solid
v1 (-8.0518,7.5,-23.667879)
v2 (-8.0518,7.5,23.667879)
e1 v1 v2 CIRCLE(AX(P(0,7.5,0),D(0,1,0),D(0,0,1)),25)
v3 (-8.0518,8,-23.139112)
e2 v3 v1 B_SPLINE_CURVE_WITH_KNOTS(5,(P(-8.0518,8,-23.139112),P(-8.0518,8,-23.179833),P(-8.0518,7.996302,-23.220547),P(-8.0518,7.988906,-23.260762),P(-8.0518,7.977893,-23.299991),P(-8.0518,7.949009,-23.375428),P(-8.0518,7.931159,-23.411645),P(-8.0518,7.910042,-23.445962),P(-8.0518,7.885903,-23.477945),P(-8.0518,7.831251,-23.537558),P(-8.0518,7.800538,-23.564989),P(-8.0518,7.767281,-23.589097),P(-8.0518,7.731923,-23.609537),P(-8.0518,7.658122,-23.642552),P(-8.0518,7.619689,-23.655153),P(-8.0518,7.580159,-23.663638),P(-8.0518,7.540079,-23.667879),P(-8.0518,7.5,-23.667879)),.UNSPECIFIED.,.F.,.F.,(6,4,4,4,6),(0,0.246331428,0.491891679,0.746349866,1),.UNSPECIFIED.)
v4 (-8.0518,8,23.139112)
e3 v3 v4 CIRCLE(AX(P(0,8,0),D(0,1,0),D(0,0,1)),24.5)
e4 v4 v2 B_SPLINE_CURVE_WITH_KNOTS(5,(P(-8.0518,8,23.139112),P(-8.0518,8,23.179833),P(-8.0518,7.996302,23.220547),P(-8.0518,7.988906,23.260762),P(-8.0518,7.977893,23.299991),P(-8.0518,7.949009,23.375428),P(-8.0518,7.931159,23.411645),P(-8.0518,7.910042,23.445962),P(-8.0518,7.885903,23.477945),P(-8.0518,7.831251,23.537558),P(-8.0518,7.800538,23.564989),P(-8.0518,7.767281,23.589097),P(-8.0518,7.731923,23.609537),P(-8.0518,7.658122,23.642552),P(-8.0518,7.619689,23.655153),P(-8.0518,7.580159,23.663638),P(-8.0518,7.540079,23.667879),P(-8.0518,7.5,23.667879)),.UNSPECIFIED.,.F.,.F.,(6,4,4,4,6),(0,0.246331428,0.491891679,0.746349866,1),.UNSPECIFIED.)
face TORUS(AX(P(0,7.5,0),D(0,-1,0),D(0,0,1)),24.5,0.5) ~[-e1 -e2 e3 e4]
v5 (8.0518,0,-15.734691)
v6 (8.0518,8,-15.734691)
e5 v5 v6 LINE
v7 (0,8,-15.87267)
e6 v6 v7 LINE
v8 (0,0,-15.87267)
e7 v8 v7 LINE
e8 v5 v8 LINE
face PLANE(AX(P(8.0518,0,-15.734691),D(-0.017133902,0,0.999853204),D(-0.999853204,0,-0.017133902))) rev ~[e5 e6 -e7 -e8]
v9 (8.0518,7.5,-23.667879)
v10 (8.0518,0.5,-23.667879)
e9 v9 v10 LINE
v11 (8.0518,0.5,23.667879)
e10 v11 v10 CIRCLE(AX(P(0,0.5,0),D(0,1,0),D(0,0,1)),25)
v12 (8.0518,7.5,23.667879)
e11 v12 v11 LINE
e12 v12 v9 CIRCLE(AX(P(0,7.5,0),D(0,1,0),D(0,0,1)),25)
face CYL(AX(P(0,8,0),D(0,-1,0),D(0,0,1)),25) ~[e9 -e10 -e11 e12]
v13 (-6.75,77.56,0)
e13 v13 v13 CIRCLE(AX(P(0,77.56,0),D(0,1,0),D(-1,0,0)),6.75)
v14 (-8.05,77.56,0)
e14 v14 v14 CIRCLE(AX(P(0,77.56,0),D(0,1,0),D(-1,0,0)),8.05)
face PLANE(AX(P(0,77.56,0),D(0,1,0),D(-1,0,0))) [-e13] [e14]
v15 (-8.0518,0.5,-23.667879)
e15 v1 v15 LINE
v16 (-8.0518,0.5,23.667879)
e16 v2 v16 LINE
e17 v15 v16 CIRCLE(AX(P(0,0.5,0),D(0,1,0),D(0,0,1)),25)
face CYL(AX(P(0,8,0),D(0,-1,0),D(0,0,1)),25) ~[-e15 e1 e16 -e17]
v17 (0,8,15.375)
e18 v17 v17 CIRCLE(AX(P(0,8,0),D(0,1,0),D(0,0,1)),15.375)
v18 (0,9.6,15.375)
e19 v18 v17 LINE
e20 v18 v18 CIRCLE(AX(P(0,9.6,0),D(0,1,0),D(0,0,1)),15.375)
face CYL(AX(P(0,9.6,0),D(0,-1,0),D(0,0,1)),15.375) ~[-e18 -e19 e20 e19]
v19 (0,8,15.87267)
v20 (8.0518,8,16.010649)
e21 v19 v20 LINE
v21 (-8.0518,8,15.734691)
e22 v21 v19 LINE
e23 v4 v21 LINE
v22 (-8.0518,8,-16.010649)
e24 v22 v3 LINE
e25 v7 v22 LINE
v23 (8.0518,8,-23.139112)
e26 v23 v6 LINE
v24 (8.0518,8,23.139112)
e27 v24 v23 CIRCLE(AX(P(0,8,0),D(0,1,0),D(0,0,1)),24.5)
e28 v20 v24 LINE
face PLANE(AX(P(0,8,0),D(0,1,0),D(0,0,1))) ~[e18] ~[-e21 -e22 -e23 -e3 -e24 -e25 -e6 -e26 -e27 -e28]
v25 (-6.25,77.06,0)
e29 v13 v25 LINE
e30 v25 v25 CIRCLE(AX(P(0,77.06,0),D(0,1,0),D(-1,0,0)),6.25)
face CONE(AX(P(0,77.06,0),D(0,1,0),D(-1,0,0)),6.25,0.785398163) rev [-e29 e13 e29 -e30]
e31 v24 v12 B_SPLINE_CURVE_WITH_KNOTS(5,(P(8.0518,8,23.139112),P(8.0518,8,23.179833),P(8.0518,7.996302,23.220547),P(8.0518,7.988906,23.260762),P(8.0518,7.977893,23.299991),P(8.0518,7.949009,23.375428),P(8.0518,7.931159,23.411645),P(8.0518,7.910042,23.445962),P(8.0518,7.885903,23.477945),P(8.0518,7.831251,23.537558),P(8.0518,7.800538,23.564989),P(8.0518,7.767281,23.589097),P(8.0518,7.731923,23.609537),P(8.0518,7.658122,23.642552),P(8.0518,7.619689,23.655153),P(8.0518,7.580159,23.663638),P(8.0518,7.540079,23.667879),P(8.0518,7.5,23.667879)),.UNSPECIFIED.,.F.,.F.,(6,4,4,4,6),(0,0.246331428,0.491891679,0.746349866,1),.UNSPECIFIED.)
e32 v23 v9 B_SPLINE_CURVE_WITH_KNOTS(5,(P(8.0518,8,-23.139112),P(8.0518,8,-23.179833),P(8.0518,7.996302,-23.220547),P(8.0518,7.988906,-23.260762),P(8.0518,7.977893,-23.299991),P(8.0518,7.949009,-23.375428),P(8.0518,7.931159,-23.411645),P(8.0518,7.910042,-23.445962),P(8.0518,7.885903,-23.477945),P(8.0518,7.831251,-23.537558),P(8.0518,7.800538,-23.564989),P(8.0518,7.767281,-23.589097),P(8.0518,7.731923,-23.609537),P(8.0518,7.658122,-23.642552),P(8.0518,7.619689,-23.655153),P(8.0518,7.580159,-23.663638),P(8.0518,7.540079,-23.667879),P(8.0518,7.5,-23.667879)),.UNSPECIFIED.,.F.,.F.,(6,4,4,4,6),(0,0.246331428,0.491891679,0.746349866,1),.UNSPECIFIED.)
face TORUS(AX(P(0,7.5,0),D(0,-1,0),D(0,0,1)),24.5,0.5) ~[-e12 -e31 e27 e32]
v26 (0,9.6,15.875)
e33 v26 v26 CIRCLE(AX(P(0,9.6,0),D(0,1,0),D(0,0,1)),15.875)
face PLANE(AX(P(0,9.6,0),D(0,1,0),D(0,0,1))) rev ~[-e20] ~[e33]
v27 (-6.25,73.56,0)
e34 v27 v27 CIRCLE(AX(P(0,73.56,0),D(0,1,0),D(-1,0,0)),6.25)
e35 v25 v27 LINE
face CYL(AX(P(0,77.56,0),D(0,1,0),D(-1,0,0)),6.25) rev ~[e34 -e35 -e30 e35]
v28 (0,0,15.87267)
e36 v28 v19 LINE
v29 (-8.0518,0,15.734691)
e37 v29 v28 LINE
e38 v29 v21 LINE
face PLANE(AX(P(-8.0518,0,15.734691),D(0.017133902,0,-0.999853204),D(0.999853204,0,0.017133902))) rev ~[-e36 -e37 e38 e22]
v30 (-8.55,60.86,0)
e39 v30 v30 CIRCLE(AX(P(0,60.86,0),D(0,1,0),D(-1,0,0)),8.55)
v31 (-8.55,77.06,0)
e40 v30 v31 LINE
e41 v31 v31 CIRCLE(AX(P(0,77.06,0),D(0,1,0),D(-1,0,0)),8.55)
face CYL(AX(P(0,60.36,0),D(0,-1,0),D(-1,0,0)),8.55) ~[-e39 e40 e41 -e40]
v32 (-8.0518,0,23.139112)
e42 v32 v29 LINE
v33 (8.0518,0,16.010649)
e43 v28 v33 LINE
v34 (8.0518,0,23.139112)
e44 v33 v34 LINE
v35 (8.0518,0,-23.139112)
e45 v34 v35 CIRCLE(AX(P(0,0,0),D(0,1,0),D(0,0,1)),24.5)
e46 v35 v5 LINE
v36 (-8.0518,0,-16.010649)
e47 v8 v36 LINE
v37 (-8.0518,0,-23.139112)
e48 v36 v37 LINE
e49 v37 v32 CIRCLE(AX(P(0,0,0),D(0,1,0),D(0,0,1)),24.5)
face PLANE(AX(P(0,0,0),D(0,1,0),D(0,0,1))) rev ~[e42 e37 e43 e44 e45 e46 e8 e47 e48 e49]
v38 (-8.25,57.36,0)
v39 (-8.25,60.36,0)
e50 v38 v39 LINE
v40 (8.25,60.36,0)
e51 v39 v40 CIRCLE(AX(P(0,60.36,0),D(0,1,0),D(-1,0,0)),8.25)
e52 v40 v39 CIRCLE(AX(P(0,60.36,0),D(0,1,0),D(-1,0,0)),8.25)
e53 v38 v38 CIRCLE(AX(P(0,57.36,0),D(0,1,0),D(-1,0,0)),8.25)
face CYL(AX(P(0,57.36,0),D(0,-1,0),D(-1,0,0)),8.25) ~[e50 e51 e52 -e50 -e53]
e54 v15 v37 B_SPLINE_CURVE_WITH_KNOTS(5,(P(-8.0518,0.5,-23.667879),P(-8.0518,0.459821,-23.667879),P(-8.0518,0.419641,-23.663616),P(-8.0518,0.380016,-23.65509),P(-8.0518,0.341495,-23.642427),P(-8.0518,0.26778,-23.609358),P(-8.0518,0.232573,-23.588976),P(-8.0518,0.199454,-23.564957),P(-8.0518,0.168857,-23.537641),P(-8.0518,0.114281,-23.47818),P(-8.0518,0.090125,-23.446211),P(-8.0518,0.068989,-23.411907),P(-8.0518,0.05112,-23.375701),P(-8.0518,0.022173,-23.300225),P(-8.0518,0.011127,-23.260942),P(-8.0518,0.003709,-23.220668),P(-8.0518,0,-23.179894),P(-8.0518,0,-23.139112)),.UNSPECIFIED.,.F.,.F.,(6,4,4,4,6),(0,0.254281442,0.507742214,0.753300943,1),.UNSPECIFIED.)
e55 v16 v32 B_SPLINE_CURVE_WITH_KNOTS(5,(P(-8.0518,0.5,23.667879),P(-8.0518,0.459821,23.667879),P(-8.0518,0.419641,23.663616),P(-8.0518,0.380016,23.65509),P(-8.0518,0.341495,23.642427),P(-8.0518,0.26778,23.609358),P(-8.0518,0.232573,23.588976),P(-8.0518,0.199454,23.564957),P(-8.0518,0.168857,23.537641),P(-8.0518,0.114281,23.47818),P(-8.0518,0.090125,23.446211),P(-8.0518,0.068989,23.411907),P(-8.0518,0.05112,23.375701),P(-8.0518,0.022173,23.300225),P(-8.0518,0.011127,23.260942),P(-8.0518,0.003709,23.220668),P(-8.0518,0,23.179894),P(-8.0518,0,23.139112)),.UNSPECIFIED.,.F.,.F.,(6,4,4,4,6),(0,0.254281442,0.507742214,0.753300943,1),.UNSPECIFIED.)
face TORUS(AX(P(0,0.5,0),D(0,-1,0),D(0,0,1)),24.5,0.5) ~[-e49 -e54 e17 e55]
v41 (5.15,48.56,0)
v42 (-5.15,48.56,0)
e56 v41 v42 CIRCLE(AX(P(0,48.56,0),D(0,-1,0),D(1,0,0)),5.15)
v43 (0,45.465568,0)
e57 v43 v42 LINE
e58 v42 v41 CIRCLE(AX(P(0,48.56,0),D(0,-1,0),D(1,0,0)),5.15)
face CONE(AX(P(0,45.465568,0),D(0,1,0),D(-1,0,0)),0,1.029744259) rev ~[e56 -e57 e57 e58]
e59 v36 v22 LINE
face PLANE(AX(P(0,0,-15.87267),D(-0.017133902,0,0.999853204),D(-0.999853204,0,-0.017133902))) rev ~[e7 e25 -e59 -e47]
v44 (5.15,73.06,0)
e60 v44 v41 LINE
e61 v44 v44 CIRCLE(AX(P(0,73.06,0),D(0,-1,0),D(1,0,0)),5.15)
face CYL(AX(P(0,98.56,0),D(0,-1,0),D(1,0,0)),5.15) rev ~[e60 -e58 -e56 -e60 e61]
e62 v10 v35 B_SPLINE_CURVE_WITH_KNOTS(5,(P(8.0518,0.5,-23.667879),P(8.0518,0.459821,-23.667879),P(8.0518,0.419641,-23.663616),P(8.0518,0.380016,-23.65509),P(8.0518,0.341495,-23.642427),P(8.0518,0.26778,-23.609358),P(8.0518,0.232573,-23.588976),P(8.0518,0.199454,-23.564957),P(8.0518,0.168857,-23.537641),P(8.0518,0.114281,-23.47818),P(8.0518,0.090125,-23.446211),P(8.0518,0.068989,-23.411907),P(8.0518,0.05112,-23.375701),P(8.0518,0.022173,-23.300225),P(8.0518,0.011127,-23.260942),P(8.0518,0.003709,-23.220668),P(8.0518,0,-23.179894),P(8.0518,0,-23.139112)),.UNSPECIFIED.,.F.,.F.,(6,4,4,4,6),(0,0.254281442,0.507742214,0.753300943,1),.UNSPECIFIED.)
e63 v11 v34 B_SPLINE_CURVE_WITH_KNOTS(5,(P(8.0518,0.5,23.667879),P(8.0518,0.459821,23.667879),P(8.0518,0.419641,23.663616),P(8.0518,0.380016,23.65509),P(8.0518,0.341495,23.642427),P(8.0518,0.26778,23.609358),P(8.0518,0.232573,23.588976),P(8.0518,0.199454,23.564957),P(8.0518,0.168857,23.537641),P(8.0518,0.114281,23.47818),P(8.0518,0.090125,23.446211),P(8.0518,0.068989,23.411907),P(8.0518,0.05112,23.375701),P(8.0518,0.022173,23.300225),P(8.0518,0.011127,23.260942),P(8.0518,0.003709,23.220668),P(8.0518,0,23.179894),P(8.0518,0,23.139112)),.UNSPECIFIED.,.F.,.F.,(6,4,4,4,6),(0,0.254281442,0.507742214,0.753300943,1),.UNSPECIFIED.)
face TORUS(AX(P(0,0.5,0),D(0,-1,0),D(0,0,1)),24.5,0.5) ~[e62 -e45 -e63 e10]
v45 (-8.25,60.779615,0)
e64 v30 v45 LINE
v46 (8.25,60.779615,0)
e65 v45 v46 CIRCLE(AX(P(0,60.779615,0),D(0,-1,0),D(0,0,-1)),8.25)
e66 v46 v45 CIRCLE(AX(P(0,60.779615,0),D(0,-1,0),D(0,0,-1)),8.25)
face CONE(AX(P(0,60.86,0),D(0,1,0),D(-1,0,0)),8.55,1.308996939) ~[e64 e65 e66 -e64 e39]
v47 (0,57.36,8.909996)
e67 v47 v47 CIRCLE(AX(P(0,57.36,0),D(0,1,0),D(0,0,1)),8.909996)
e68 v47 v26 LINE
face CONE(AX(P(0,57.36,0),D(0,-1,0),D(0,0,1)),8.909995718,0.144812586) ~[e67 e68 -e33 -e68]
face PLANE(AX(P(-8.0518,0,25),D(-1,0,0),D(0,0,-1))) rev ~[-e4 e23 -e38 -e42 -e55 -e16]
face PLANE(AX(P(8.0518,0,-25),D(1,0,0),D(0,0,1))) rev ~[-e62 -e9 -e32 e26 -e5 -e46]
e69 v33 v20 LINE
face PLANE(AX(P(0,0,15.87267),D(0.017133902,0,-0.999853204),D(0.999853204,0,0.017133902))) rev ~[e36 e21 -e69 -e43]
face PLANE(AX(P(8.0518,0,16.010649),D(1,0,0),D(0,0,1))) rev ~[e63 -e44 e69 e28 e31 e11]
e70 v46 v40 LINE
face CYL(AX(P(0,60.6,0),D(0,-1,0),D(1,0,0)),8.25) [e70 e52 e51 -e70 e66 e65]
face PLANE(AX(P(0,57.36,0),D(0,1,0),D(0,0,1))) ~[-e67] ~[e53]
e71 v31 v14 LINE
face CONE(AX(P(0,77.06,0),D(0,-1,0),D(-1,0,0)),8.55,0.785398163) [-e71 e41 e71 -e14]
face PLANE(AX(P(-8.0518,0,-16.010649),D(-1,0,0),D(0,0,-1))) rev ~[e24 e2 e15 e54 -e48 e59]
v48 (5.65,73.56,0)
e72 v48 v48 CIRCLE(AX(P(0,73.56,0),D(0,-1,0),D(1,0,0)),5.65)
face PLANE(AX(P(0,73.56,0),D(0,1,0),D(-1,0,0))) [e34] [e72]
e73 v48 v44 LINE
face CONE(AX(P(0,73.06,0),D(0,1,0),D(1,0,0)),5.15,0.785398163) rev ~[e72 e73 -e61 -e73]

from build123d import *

# Parameters (mm, degrees)
F2_R             = 8.25
F3_DEPTH         = 3
F4_R             = 8.55
F5_DEPTH         = 17.2
F7_S5_R          = 8.25
F7_T6_DEPTH      = 14
F6_R             = 6.25
F8_DEPTH         = 4
F10_D            = 10.3
F10_DEPTH        = 25
F10_TIP          = 3.094432188
F11_R            = 0.5
F12_SIZE         = 0.5
F14_DEPTH        = 8
F14_COPIES_COUNT = 2


# Not quite as in the source:
# - a fillet or chamfer that OpenCascade refuses, or shapes differently, is made with other operations: its cross-section is extruded or revolved along the edge and cut away or added
# - a pattern or mirror of a feature is missing from the dataset's text; its kind, count and spacing are read off the source's solid


with BuildPart() as f1:
    # F0 (on Right) → F1 (revolve)
    with BuildSketch(Plane.YZ):
        Polygon((0, 25), (0, 0), (57.36, 0), (57.36, 8.9099957178), (9.6, 15.875), (9.6, 15.375), (8, 15.375), (8, 15.875), (8, 25), align=None)
    revolve(axis=Axis((0, 28.68, 0), (0, 1, 0)))

    # F2 (on face) → F3 (join)
    with BuildSketch(Plane(origin=(0, 57.36, 0), x_dir=(-1, 0, 0), z_dir=(0, 1, 0))):
        Circle(F2_R)
    extrude(amount=F3_DEPTH)

    # F4 (on face) → F5 (join)
    with BuildSketch(Plane(origin=(0, 60.36, 0), x_dir=(-1, 0, 0), z_dir=(0, 1, 0))):
        Circle(F4_R)
    extrude(amount=F5_DEPTH)

    # F7: chamfer of 0.5 x 1.8660254038 on 1 edges, made by hand


with BuildPart() as f7_tool2:
    # F7_s3 → F7_t4 (revolve)
    with BuildSketch(Plane.XY):
        Polygon((-8.55, 60.86), (-6.6839745962, 60.36), (-8.55, 60.36), align=None)
    revolve(axis=Axis((0, 60.36, 0), (0, 1, 0)))

    # F7_s5 → F7_t6 (cut, symmetric)
    with BuildSketch(Plane.XZ.offset(-60.6)):
        Circle(F7_S5_R)
    extrude(amount=F7_T6_DEPTH, both=True, mode=Mode.SUBTRACT)


with BuildPart() as f1_1:
    add(f1.part)

    # F7_t1: cut F7_tool2
    add(f7_tool2.part, mode=Mode.SUBTRACT)

    # F6 (on face) → F8 (cut)
    with BuildSketch(Plane(origin=(0, 77.56, 0), x_dir=(-1, 0, 0), z_dir=(0, 1, 0))):
        Circle(F6_R)
    extrude(amount=-F8_DEPTH, mode=Mode.SUBTRACT)

    # F10
    with Locations(Plane(origin=(0, 73.56, 0), x_dir=(-1, 0, 0), z_dir=(0, 1, 0))):
        with Locations((0, 0)):
            Hole(F10_D / 2, depth=F10_DEPTH)
            with Locations((0, 0, -(F10_DEPTH + F10_TIP / 2))):  # 118° drill point
                Cone(0, F10_D / 2, F10_TIP, mode=Mode.SUBTRACT)

    # F11
    f11_edges = [f1_1.edges().sort_by_distance(p)[0] for p in [
        (0, 8, -25),
        (0, 0, -25),
        (0, 4, 25),
    ]]
    fillet(f11_edges, radius=F11_R)

    # F12
    f12_edges = [f1_1.edges().sort_by_distance(p)[0] for p in [
        (8.55, 77.56, 0),
        (6.25, 77.56, 0),
        (5.15, 73.56, 0),
    ]]
    chamfer(f12_edges, length=F12_SIZE)

    # F13 (on face) → F14 (cut, through all)
    with BuildSketch(Plane.XZ):
        Polygon((-8.0518, 15.7346906059), (0, 15.8726696123), (8.0518, 16.0106486188), (8.0518, 25), (-8.0518, 25), align=None)
    f14 = extrude(amount=-F14_DEPTH, mode=Mode.SUBTRACT)

    # F14_copies: F14 ×2 about axis
    f14_copies_axis = Axis((0, 0, 0), (0, 1, 0))
    for i in range(1, F14_COPIES_COUNT):
        add(f14.rotate(f14_copies_axis, i * 360 / F14_COPIES_COUNT), mode=Mode.SUBTRACT)


solid = f1_1.part
